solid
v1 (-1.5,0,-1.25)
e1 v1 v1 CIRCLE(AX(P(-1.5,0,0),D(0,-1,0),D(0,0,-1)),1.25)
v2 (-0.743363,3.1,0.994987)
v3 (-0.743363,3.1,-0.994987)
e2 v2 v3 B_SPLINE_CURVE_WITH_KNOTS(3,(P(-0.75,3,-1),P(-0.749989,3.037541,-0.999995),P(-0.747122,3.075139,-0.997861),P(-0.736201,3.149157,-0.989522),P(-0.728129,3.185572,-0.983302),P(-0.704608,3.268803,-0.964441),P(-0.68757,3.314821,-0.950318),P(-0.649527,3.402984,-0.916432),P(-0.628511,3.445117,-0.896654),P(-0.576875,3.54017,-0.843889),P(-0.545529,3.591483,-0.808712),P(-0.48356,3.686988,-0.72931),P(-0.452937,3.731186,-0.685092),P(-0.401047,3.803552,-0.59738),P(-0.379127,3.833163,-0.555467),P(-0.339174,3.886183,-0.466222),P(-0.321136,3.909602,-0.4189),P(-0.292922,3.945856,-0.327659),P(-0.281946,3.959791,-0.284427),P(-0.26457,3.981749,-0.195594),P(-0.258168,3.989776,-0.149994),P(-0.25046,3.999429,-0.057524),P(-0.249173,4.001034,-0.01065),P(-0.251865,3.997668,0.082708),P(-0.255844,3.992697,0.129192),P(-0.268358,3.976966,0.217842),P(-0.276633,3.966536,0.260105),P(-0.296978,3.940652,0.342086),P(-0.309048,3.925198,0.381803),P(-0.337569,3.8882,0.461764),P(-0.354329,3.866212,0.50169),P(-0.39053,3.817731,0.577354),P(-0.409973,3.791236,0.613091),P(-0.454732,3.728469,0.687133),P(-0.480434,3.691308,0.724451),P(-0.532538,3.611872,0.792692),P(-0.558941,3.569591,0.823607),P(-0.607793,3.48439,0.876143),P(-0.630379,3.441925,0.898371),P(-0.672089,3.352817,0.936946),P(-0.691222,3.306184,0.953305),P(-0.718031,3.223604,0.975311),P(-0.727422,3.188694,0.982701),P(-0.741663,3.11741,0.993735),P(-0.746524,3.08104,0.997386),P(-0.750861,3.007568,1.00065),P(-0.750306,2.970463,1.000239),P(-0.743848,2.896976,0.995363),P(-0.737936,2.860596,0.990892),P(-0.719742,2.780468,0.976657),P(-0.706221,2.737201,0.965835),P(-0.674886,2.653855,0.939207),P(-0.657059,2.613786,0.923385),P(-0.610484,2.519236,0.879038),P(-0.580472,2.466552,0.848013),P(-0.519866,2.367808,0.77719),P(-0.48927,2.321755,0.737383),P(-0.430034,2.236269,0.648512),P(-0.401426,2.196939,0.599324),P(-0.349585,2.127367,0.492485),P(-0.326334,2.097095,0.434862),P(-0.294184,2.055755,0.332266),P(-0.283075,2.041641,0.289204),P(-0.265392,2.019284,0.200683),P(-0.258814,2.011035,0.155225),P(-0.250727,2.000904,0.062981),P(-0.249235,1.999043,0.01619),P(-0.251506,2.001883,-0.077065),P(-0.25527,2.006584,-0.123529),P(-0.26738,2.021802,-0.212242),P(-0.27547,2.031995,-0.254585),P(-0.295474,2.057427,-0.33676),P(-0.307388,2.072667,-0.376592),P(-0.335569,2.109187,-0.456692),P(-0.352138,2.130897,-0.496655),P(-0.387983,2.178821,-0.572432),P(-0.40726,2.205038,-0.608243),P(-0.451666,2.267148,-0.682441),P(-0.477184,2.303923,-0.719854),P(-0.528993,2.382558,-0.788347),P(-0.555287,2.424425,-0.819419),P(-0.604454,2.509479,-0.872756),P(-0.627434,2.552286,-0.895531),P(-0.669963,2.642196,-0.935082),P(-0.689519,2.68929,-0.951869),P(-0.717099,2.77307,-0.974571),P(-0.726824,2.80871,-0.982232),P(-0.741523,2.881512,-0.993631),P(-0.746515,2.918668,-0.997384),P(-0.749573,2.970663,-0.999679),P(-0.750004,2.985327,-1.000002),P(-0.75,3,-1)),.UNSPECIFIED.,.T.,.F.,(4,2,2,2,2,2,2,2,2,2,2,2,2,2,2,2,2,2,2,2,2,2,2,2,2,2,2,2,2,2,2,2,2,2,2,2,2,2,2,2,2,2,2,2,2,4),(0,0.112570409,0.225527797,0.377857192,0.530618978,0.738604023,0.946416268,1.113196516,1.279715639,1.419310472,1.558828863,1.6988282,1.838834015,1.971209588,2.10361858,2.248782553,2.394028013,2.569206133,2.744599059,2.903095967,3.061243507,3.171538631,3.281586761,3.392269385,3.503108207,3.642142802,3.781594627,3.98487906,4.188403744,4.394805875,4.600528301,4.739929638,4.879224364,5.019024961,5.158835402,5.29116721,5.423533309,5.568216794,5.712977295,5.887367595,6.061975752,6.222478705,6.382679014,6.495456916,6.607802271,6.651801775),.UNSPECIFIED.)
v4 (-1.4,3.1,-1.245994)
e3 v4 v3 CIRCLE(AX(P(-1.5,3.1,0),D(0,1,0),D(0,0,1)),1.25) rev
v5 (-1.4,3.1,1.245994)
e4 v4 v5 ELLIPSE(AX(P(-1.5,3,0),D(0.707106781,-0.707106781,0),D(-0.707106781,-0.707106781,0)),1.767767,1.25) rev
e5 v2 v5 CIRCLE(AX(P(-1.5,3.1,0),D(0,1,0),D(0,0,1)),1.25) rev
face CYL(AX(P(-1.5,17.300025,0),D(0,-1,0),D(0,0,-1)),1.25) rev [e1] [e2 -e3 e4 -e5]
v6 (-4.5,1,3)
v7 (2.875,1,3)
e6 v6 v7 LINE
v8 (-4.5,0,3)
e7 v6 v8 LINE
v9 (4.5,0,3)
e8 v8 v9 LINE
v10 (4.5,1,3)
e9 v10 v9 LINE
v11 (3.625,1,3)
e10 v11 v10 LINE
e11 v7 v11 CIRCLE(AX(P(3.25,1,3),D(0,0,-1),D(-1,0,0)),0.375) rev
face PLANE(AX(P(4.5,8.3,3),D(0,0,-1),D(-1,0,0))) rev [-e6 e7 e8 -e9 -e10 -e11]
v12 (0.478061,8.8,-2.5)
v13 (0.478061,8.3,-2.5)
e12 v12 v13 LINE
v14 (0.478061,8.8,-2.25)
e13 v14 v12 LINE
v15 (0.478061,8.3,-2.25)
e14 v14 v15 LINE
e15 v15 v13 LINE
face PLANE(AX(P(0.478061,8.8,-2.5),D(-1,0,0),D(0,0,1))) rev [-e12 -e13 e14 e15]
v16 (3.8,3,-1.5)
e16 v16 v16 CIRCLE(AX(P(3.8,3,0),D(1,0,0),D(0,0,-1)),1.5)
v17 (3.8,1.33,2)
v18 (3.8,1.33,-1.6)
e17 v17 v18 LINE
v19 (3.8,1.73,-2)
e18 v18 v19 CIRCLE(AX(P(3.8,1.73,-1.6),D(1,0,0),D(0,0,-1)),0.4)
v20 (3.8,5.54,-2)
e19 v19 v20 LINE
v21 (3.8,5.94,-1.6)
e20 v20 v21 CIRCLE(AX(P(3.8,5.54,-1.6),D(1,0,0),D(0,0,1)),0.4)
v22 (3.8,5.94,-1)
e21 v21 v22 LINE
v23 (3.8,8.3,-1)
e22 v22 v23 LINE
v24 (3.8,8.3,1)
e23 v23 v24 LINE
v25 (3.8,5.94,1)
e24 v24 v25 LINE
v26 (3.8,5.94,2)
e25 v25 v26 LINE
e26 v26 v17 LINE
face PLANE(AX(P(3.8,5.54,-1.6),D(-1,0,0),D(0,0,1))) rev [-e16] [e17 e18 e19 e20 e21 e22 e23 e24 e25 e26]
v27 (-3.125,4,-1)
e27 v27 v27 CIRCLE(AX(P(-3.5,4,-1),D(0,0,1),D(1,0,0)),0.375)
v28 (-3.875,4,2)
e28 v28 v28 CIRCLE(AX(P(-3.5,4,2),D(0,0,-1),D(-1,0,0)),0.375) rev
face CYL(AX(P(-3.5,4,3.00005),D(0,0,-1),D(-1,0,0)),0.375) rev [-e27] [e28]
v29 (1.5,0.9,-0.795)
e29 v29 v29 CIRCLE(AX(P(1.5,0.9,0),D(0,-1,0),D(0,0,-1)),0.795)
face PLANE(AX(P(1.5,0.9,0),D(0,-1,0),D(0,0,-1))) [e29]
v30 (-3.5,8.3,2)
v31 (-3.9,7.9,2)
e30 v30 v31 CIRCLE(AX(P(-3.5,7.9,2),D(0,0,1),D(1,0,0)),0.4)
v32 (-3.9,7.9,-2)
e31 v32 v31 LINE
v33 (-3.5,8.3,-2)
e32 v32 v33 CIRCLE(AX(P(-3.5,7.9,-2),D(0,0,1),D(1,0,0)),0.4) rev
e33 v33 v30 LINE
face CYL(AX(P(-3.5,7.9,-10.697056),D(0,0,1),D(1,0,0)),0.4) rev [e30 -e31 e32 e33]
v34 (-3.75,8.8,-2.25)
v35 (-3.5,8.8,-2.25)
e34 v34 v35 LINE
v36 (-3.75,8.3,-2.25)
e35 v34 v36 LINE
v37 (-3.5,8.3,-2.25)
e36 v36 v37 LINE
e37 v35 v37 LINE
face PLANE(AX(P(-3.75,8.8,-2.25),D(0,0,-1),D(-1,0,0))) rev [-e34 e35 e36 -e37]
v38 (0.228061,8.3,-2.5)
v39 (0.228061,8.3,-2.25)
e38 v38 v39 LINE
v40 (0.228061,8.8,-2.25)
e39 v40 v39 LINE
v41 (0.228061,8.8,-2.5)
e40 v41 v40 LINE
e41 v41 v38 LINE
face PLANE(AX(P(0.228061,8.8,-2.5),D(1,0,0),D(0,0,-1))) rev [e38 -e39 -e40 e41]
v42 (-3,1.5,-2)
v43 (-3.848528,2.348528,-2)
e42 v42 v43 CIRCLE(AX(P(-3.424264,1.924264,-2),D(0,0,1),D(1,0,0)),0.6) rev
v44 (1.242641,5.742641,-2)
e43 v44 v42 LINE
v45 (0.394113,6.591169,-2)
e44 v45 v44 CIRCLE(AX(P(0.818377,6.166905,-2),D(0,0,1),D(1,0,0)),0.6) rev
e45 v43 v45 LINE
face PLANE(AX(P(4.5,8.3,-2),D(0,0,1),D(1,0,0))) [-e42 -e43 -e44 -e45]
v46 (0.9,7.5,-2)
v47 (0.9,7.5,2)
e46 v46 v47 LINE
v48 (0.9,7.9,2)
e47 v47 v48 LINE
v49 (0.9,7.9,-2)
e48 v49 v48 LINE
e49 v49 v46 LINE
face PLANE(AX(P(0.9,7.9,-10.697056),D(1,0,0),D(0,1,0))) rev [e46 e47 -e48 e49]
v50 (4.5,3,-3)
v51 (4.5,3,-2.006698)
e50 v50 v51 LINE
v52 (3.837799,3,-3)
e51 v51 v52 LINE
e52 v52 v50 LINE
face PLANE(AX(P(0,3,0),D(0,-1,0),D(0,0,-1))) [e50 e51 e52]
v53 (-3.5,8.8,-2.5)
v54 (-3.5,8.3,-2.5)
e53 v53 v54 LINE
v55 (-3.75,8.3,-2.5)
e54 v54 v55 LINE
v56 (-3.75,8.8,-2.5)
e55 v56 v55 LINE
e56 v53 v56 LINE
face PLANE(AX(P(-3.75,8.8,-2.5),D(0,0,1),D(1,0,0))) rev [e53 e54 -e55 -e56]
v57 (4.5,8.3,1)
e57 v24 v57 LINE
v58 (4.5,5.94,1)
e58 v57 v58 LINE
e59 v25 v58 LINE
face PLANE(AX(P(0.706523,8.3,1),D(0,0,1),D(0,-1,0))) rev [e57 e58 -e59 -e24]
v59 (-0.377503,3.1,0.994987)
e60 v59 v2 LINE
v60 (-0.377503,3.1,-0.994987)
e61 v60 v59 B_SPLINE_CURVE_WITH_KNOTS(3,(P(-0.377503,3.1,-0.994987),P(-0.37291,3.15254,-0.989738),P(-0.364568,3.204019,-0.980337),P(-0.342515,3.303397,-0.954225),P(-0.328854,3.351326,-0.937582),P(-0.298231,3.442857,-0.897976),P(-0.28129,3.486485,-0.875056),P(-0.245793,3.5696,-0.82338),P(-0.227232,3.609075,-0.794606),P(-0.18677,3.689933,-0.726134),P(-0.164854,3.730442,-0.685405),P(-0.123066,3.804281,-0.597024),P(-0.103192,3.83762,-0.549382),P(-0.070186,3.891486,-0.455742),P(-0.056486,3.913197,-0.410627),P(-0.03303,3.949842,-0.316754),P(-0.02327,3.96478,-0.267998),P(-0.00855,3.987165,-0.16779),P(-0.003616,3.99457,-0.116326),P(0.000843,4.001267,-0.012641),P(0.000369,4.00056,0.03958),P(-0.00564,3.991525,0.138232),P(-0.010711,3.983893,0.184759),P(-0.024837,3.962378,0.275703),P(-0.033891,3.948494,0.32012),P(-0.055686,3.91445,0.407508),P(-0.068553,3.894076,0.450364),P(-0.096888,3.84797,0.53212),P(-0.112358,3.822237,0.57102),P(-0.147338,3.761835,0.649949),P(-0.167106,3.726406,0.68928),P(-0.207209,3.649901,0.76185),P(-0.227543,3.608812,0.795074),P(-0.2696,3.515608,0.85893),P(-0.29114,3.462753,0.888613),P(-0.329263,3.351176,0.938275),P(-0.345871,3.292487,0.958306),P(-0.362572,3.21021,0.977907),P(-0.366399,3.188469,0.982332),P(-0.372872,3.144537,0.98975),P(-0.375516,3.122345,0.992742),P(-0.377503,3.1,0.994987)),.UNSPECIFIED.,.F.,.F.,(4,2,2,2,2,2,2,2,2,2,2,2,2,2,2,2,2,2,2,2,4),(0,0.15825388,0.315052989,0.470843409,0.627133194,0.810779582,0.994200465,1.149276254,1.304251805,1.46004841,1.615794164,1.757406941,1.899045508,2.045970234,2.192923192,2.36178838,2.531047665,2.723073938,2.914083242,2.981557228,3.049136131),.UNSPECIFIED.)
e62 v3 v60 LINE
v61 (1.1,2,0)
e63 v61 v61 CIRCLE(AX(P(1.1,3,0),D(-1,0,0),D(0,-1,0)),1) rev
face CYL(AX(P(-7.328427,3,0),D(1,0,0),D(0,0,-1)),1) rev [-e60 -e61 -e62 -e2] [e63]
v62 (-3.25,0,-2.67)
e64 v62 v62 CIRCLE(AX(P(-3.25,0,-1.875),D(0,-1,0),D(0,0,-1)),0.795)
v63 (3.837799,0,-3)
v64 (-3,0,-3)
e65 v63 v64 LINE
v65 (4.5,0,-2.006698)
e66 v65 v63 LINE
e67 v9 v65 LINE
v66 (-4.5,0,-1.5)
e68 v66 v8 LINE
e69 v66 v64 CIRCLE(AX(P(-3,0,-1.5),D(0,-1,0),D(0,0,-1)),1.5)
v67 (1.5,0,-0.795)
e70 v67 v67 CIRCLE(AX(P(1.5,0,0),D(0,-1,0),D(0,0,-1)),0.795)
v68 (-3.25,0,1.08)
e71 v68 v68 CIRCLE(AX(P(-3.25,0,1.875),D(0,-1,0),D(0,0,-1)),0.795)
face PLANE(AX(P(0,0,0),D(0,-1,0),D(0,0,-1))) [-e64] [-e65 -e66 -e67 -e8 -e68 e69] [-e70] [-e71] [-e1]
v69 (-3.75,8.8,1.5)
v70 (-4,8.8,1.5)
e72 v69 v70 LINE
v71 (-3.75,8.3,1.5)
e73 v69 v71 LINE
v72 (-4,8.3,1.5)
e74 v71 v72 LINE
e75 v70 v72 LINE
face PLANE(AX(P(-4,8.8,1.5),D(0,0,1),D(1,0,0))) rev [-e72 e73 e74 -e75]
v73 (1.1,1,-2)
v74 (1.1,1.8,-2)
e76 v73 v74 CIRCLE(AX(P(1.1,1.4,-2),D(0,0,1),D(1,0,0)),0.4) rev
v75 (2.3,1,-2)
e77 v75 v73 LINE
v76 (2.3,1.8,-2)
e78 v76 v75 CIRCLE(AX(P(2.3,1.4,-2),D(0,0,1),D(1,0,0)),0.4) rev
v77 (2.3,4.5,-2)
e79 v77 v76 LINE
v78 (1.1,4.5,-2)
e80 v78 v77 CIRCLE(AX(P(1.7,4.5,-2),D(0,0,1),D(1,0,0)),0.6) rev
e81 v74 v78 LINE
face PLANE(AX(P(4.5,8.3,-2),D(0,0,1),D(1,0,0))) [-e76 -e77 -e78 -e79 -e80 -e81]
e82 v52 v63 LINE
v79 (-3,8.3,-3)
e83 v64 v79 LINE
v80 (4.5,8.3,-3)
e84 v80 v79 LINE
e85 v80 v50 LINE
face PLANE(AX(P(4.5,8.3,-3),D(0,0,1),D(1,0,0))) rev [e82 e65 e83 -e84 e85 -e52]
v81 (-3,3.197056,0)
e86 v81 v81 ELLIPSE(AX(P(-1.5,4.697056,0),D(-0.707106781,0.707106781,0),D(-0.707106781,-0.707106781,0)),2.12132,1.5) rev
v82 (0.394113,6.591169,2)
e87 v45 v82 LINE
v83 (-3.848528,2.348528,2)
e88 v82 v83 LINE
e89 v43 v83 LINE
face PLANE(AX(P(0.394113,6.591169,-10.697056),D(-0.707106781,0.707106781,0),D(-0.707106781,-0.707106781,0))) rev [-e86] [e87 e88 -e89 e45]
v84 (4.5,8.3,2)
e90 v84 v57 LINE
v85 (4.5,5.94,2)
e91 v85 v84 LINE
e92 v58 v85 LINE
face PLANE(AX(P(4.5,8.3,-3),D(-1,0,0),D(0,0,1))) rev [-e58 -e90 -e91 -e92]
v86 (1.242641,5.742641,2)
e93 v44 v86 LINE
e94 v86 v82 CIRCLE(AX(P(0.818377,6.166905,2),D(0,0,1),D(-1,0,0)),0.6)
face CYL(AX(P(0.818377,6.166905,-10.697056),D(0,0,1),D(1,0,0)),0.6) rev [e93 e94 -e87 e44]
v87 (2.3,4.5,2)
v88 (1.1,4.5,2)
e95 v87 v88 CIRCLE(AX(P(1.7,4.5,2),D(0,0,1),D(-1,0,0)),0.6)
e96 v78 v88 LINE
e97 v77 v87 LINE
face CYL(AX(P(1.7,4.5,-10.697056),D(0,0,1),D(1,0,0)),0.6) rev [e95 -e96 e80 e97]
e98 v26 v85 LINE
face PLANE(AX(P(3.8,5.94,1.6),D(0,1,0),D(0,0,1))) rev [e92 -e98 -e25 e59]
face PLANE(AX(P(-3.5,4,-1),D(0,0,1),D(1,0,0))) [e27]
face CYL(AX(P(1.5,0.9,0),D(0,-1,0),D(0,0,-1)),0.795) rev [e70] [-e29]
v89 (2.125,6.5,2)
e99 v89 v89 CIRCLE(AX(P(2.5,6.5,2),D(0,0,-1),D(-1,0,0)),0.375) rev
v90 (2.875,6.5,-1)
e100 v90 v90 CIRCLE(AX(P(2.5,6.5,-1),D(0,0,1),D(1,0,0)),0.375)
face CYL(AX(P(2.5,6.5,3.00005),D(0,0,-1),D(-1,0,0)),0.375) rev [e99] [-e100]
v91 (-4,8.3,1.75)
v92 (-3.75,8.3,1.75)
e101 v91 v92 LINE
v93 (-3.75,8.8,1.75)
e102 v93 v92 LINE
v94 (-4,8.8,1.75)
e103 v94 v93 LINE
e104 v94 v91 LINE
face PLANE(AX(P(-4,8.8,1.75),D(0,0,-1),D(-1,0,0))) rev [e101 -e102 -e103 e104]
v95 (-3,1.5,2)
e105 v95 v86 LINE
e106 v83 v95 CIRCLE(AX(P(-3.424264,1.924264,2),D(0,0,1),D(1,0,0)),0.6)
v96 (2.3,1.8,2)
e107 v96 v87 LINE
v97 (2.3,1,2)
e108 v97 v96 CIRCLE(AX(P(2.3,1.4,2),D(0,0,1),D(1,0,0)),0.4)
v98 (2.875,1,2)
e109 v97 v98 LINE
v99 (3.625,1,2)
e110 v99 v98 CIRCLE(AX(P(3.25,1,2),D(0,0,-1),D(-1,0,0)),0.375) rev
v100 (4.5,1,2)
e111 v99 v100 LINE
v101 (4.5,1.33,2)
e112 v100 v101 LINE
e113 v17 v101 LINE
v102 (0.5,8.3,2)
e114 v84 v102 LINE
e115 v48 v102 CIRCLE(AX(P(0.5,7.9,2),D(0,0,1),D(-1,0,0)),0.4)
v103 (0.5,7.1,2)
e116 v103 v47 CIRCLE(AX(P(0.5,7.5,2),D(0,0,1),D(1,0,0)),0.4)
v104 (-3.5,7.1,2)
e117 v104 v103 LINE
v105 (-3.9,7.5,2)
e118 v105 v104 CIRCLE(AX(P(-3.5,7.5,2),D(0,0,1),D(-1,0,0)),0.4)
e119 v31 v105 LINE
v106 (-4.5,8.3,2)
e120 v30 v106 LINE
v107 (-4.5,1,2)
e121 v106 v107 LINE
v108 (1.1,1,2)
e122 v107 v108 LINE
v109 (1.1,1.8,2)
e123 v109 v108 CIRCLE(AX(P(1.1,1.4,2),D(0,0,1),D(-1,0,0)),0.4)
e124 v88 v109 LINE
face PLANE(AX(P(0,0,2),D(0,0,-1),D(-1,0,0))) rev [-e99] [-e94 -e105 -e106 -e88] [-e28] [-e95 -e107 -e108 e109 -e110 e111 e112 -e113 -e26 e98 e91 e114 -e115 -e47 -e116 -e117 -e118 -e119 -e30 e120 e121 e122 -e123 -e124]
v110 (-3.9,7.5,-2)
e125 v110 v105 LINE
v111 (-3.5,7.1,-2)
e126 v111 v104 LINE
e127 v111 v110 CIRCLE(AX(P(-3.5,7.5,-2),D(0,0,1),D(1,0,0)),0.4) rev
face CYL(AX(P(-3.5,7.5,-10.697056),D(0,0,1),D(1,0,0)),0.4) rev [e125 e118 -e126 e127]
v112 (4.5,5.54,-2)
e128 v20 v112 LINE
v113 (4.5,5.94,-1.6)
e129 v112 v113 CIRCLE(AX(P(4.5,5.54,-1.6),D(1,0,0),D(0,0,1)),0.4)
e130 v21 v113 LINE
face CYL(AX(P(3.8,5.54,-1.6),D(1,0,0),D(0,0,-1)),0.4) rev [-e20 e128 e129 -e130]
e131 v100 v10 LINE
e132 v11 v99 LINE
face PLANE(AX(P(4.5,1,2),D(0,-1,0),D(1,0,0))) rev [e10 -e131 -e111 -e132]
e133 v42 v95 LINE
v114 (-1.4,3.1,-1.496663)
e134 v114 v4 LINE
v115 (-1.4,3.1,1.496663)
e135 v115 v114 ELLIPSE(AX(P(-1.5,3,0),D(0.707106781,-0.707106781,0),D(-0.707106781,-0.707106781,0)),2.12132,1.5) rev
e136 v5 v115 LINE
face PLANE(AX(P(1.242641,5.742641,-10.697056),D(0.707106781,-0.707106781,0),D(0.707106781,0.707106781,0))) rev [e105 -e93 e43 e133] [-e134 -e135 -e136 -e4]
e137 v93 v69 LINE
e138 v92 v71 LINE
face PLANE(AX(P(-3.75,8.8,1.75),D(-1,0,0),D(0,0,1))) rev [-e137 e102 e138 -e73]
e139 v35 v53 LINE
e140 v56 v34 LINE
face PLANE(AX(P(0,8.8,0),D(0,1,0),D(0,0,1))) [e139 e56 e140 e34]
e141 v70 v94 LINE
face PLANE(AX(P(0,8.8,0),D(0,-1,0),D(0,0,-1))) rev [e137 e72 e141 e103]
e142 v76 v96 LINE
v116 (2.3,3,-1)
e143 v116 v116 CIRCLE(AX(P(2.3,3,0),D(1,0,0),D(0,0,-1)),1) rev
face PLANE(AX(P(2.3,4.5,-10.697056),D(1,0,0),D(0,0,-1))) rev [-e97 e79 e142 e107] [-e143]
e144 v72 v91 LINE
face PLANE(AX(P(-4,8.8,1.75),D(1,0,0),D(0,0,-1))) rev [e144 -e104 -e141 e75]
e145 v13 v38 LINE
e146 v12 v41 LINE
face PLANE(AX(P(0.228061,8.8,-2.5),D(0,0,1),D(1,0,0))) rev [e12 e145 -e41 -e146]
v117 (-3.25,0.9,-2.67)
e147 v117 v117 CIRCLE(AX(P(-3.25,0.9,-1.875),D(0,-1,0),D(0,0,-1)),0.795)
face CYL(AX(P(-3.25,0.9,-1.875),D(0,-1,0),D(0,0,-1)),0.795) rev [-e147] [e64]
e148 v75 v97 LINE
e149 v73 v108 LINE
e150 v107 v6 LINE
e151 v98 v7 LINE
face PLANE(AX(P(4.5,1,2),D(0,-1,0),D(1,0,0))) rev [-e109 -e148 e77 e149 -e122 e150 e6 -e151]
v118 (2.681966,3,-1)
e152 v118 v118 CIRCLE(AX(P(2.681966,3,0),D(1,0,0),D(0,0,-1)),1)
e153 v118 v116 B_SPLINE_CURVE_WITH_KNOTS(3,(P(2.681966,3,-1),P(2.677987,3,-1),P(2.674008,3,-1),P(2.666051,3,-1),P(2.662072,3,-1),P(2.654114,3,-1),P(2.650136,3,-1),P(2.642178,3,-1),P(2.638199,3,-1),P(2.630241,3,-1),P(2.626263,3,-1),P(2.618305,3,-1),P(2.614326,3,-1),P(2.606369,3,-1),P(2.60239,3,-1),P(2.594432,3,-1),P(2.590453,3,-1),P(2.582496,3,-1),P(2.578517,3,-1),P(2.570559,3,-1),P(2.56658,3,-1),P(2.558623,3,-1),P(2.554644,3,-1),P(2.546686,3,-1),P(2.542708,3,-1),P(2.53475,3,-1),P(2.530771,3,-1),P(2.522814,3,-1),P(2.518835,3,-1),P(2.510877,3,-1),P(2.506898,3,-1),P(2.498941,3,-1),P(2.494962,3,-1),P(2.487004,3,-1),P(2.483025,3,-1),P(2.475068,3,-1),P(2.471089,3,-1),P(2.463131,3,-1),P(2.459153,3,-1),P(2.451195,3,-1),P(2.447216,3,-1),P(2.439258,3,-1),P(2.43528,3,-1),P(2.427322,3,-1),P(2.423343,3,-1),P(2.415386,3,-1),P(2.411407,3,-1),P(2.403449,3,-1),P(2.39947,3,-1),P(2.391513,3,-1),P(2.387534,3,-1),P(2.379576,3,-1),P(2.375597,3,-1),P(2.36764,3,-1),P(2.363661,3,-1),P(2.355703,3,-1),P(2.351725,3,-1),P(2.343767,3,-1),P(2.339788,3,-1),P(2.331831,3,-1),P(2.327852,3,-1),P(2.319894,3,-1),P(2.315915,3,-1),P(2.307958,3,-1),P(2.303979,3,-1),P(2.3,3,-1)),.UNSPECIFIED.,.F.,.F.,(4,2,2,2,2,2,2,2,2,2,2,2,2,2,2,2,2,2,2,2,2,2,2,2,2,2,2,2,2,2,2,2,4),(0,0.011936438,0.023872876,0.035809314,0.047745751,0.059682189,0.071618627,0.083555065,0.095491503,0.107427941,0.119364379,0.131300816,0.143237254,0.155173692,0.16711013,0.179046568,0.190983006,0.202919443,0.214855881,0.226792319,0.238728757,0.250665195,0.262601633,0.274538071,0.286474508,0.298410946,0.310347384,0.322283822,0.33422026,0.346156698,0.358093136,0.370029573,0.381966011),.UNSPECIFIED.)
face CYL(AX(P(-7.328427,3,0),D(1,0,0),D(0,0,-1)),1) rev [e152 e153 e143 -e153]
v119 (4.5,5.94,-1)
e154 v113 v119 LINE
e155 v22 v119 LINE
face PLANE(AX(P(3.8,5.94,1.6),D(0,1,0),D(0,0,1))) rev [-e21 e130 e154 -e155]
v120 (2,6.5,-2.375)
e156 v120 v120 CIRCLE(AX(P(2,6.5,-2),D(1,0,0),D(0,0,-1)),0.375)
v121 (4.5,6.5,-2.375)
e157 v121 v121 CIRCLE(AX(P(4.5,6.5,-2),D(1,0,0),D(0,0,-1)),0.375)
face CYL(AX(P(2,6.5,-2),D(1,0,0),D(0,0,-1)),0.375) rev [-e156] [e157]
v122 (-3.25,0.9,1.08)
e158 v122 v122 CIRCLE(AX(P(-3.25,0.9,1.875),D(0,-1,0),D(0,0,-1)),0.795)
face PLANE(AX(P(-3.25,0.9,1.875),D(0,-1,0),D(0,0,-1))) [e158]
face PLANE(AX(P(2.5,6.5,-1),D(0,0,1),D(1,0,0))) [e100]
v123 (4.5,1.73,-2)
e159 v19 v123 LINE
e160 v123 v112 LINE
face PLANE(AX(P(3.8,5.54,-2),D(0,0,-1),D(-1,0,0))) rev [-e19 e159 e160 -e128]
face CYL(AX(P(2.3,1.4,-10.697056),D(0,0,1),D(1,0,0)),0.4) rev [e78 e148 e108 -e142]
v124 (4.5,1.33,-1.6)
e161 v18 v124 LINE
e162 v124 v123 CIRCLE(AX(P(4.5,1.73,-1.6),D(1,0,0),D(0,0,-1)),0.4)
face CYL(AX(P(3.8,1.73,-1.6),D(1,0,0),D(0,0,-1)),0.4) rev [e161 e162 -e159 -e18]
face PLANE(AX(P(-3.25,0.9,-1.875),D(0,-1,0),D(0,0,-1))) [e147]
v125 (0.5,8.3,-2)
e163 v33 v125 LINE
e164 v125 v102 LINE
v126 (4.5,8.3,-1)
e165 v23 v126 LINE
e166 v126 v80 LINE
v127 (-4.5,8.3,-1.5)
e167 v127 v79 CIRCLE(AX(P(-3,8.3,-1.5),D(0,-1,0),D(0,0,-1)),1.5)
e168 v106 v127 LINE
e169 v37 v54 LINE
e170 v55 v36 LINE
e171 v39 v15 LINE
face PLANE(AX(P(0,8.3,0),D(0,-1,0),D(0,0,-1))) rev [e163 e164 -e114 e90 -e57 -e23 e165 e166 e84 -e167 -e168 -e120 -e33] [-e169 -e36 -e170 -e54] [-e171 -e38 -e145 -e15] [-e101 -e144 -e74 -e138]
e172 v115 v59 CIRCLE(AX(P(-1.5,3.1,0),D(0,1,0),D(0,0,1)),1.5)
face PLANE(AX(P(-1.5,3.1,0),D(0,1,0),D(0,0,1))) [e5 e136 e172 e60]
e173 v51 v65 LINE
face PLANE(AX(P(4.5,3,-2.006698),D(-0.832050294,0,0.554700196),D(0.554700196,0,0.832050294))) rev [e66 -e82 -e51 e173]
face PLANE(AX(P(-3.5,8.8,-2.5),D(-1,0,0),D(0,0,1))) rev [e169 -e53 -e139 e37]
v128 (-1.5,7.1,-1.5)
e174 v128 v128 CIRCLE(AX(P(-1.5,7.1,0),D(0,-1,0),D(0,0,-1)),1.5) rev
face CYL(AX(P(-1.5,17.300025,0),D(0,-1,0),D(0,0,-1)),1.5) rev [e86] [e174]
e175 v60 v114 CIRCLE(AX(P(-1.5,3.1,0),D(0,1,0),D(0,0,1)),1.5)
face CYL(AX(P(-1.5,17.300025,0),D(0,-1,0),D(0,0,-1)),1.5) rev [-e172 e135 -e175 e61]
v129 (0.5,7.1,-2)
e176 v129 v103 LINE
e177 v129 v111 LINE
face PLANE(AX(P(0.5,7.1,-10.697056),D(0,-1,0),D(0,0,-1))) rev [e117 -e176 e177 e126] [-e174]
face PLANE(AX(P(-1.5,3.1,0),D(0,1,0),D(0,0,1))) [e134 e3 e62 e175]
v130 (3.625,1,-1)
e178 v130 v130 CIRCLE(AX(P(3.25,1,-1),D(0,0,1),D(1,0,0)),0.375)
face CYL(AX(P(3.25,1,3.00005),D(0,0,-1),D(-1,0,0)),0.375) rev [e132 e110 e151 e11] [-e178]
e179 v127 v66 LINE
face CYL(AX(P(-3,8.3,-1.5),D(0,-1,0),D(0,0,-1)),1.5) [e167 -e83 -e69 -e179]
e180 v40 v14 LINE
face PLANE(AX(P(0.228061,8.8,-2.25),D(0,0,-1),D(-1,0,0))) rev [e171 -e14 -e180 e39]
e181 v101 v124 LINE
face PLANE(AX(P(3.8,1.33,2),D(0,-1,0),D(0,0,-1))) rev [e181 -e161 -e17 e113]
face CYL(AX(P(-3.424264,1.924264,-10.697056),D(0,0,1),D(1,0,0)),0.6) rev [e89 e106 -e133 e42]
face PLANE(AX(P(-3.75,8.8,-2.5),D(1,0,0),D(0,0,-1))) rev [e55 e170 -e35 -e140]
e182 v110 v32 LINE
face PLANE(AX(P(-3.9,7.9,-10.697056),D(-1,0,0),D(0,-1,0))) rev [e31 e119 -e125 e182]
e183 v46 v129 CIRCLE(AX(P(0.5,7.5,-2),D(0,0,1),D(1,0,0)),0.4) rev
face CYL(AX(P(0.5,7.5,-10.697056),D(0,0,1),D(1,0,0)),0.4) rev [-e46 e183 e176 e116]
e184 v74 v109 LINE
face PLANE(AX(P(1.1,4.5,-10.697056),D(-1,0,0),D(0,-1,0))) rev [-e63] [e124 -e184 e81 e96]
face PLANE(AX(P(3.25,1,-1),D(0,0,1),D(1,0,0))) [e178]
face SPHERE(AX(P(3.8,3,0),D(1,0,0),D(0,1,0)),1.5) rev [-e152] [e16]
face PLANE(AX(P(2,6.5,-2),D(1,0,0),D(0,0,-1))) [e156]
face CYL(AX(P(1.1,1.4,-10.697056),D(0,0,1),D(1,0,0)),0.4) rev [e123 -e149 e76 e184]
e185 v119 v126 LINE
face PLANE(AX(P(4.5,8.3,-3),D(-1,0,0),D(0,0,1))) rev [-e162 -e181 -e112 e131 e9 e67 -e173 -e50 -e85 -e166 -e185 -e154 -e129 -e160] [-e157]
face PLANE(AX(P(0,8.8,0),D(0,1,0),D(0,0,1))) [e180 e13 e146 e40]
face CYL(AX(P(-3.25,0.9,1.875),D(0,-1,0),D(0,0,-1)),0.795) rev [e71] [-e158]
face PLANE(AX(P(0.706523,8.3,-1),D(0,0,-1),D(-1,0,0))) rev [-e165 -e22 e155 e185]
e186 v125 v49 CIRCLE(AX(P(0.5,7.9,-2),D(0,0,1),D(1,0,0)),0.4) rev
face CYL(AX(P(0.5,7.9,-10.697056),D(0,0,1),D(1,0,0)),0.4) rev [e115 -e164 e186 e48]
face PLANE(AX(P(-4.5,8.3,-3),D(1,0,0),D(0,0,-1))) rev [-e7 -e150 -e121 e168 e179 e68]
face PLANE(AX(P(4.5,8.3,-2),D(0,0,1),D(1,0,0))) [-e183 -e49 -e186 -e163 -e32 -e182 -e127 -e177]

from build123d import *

# Parameters (mm, degrees)
SKETCH1_W                       = 9
SKETCH1_H                       = 6
MAIN_BODY_EXT_DEPTH             = 8.3
EMISSION_PATH_EXT_DEPTH         = 9
SKETCH3_R                       = 1.25
EMISSION_AND_GRIN_CUT_DEPTH     = 19.125672401
SKETCH4_R                       = 1
DRUM_LENS_CUT_DEPTH             = 7
SKETCH5_W                       = 9
SKETCH5_H                       = 7.3
FILTERSET_CUT1_DEPTH            = 1
FILTERSET_CUT2_DEPTH            = 4
SKETCH10_R                      = 2.5
EMISSION_LENS_CUT_DEPTH         = 8.5
SKETCH15_R                      = 0.795
MAGNETS_CUT_DEPTH               = 0.9
SCREW_HOLES_CUT_DEPTH           = 19.561788707
SCREW_HOLES_CUT_DEPTH_BACK      = 3
SKETCH18_R                      = 0.375
EXTERNAL_FILLET_1_R             = 1.5
CUT_EXTRUDE8_DEPTH              = 12.545128843
CUT_EXTRUDE8_DEPTH_BACK         = 4
SKETCH28_R                      = 1.5
CUT_EXTRUDE9_DEPTH              = 3
CUT_EXTRUDE10_DEPTH             = 0.7
SKETCH29_R                      = 0.375
CUT_EXTRUDE11_DEPTH             = 2.5
SKETCH32_W                      = 2
SKETCH32_H                      = 2.36
CUT_EXTRUDE14_DEPTH             = 0.7
CUT_EXTRUDE16_DEPTH             = 9
CUT_EXTRUDE17_REACH             = 12.329
SKETCH37_R                      = 2
CUT_EXTRUDE18_START             = -9
CUT_EXTRUDE18_DEPTH             = 9
CUT_EXTRUDE19_REACH             = 20.126
SKETCH39_W                      = 5.765434423
SKETCH39_H                      = 9
CUT_EXTRUDE19_DIRECTION_2_REACH = 20.126
SKETCH40_W                      = 0.25
SKETCH40_H                      = 0.25
BOSS_EXTRUDE1_DEPTH             = 0.5


with BuildPart() as part:
    # Sketch1 → Main Body Ext (new body)
    with BuildSketch(Plane(origin=(0, 0, 0), x_dir=(1, 0, 0), z_dir=(0, 1, 0))):
        Rectangle(SKETCH1_W, SKETCH1_H)
    extrude(amount=MAIN_BODY_EXT_DEPTH)

    # Sketch8 → Emission Path Ext (add)
    with BuildSketch(Plane(origin=(0, 8.3, 0), x_dir=(1, 0, 0), z_dir=(0, 1, 0))):
        Polygon((0.25, 3), (1.5, 1.75), (1.5, -3), (-4.5, -3), (-4.5, 3), align=None)
    extrude(amount=EMISSION_PATH_EXT_DEPTH)

    # Sketch3 → Emission and Grin Cut (cut, through all)
    with BuildSketch(Plane.XZ):
        with Locations(Location((-1.5, 0, 0), (0, 0, 270))):
            Circle(SKETCH3_R)
    extrude(amount=-EMISSION_AND_GRIN_CUT_DEPTH, mode=Mode.SUBTRACT)

    # Sketch4 → Drum Lens Cut (cut)
    with BuildSketch(Plane(origin=(4.5, 0, 0), x_dir=(0, 0, -1), z_dir=(1, 0, 0))):
        with Locations((0, 3)):
            Circle(SKETCH4_R)
    extrude(amount=-DRUM_LENS_CUT_DEPTH, mode=Mode.SUBTRACT)

    # Sketch5 → FilterSet Cut1 (cut)
    with BuildSketch(Plane.XY.offset(3)):
        with Locations((0, 4.65)):
            Rectangle(SKETCH5_W, SKETCH5_H)
    extrude(amount=-FILTERSET_CUT1_DEPTH, mode=Mode.SUBTRACT)

    # Sketch6 → FilterSet Cut2 (cut)
    with BuildSketch(Plane.XY.offset(2)):
        with BuildLine():
            Line((2.3, 4.5), (2.3, 1.8))
            ThreePointArc((2.3, 1.8), (2.7, 1.4), (2.3, 1))
            Line((2.3, 1), (1.1, 1))
            ThreePointArc((1.1, 1), (0.7, 1.4), (1.1, 1.8))
            Line((1.1, 1.8), (1.1, 4.5))
            ThreePointArc((1.1, 4.5), (1.7, 5.1), (2.3, 4.5))
        make_face()
        with BuildLine():
            Line((-3.9, 7.9), (-3.9, 7.5))
            ThreePointArc((-3.9, 7.5), (-3.782842712, 7.217157288), (-3.5, 7.1))
            Line((-3.5, 7.1), (0.5, 7.1))
            ThreePointArc((0.5, 7.1), (0.782842712, 7.217157288), (0.9, 7.5))
            Line((0.9, 7.5), (0.9, 7.9))
            ThreePointArc((0.9, 7.9), (0.782842712, 8.182842712), (0.5, 8.3))
            Line((0.5, 8.3), (-3.5, 8.3))
            ThreePointArc((-3.5, 8.3), (-3.782842712, 8.182842712), (-3.9, 7.9))
        make_face()
        with BuildLine():
            Line((0.39411255, 6.591168825), (-3.848528137, 2.348528137))
            ThreePointArc((-3.848528137, 2.348528137), (-3.848528137, 1.5), (-3, 1.5))
            Line((-3, 1.5), (1.242640687, 5.742640687))
            ThreePointArc((1.242640687, 5.742640687), (1.242640687, 6.591168825), (0.39411255, 6.591168825))
        make_face()
    extrude(amount=-FILTERSET_CUT2_DEPTH, mode=Mode.SUBTRACT)

    # Sketch10 → Emission Lens Cut (cut)
    with BuildSketch(Plane(origin=(0, 17.3, 0), x_dir=(1, 0, 0), z_dir=(0, 1, 0))):
        with Locations(Location((-1.5, 0, 0), (0, 0, 270))):
            Circle(SKETCH10_R)
    extrude(amount=-EMISSION_LENS_CUT_DEPTH, mode=Mode.SUBTRACT)

    # Sketch15 → Magnets Cut (cut)
    with BuildSketch(Plane.XZ):
        with Locations(Location((-3.25, -1.875, 0), (0, 0, 270))):
            Circle(SKETCH15_R)
        with Locations(Location((-3.25, 1.875, 0), (0, 0, 270))):
            Circle(SKETCH15_R)
        with Locations(Location((1.5, 0, 0), (0, 0, 270))):
            Circle(SKETCH15_R)
    extrude(amount=-MAGNETS_CUT_DEPTH, mode=Mode.SUBTRACT)

    # Sketch18 → Screw Holes Cut (cut, two sides: drawn at the far end of the back side and taken through both)
    with BuildSketch(Plane.XY.offset(2).offset(-SCREW_HOLES_CUT_DEPTH_BACK)):
        with Locations(Location((-3.5, 4, 0), (0, 0, 180))):
            Circle(SKETCH18_R)
        with Locations(Location((2.5, 6.5, 0), (0, 0, 180))):
            Circle(SKETCH18_R)
        with Locations((3.25, 1)):
            Circle(SKETCH18_R)
    extrude(amount=SCREW_HOLES_CUT_DEPTH + SCREW_HOLES_CUT_DEPTH_BACK, mode=Mode.SUBTRACT)

    # External Fillet 1
    # the kernel refuses this fillet: 1.5 mm, written as the material it takes off along each edge
    with BuildSketch(Plane(origin=(-4.5, -3.75, -3), x_dir=(1, 0, 0), z_dir=(0, 1, 0))) as external_fillet_1_piece_1:
        with BuildLine():
            CenterArc((EXTERNAL_FILLET_1_R, -EXTERNAL_FILLET_1_R), EXTERNAL_FILLET_1_R, 90, 90)
            Line((0, -EXTERNAL_FILLET_1_R), (0, 0))
            Line((0, 0), (EXTERNAL_FILLET_1_R, 0))
        make_face()
    extrude(amount=24.8, mode=Mode.SUBTRACT)
    with BuildSketch(Plane(origin=(1.5, 8.3, 3), x_dir=(0, 0, -1), z_dir=(0, 1, 0))) as external_fillet_1_piece_2:
        with BuildLine():
            CenterArc((EXTERNAL_FILLET_1_R, EXTERNAL_FILLET_1_R), EXTERNAL_FILLET_1_R, 180, 90)
            Line((0, EXTERNAL_FILLET_1_R), (0, 0))
            Line((0, 0), (EXTERNAL_FILLET_1_R, 0))
        make_face()
    extrude(amount=12.75, mode=Mode.SUBTRACT)

    # Sketch28 → Cut-Extrude8 (cut, two sides: drawn at the far end of the back side and taken through both)
    with BuildSketch(Plane(origin=(0, 7.1, 0), x_dir=(1, 0, 0), z_dir=(0, 1, 0)).offset(-CUT_EXTRUDE8_DEPTH_BACK)):
        with Locations(Location((-1.5, 0, 0), (0, 0, 180))):
            Circle(SKETCH28_R)
    extrude(amount=CUT_EXTRUDE8_DEPTH + CUT_EXTRUDE8_DEPTH_BACK, mode=Mode.SUBTRACT)

    # Sketch14 → Cut-Extrude9 (cut)
    with BuildSketch(Plane.XZ):
        Polygon((4.5, -3), (4.5, -2.006698359), (3.837798906, -3), align=None)
    extrude(amount=-CUT_EXTRUDE9_DEPTH, mode=Mode.SUBTRACT)

    # Sketch12 → Cut-Extrude10 (cut)
    with BuildSketch(Plane(origin=(4.5, 0, 0), x_dir=(0, 0, -1), z_dir=(1, 0, 0))):
        with BuildLine():
            Line((1.6, 5.94), (-1.6, 5.94))
            Line((-1.6, 5.94), (-2, 5.94))
            Line((-2, 5.94), (-2, 1.33))
            Line((-2, 1.33), (1.6, 1.33))
            ThreePointArc((1.6, 1.33), (1.882842712, 1.447157288), (2, 1.73))
            Line((2, 1.73), (2, 5.54))
            ThreePointArc((2, 5.54), (1.882842712, 5.822842712), (1.6, 5.94))
        make_face()
    extrude(amount=-CUT_EXTRUDE10_DEPTH, mode=Mode.SUBTRACT)

    # Sketch29 → Cut-Extrude11 (cut)
    with BuildSketch(Plane(origin=(4.5, 0, 0), x_dir=(0, 0, -1), z_dir=(1, 0, 0))):
        with Locations((2, 6.5)):
            Circle(SKETCH29_R)
    extrude(amount=-CUT_EXTRUDE11_DEPTH, mode=Mode.SUBTRACT)

    # Sketch32 → Cut-Extrude14 (cut)
    with BuildSketch(Plane(origin=(4.5, 0, 0), x_dir=(0, 0, -1), z_dir=(1, 0, 0))):
        with Locations((0, 7.12)):
            Rectangle(SKETCH32_W, SKETCH32_H)
    extrude(amount=-CUT_EXTRUDE14_DEPTH, mode=Mode.SUBTRACT)

    # Sketch33 → Cut-Revolve1 (revolve, cut)
    with BuildSketch(Plane.XY, mode=Mode.PRIVATE) as cut_revolve1_sk:
        with BuildLine():
            Line((3.8, 3), (2.3, 3))
            ThreePointArc((2.3, 3), (2.739339828, 4.060660172), (3.8, 4.5))
            Line((3.8, 4.5), (3.8, 3))
        make_face()
    revolve(cut_revolve1_sk.sketch.rotate(Axis((3.8, 3, 0), (-1, 0, 0)), 90), axis=Axis((3.8, 3, 0), (-1, 0, 0)), mode=Mode.SUBTRACT)

    # Sketch36 → Cut-Extrude16 (cut)
    with BuildSketch(Plane(origin=(0, 17.3, 0), x_dir=(1, 0, 0), z_dir=(0, 1, 0))):
        with BuildLine():
            Line((-4.5, -1.5), (-4.5, -3))
            Line((-4.5, -3), (-3, -3))
            ThreePointArc((-3, -3), (-4.060660172, -2.560660172), (-4.5, -1.5))
        make_face()
    extrude(amount=-CUT_EXTRUDE16_DEPTH, mode=Mode.SUBTRACT)

    # Sketch37 → Cut-Extrude17 (cut, up to next)
    with BuildSketch(Plane(origin=(0, 8.8, 0), x_dir=(1, 0, 0), z_dir=(0, 1, 0)), mode=Mode.PRIVATE) as cut_extrude17_sk1:
        with Locations(Location((-1.5, 0, 0), (0, 0, 180))):
            Circle(SKETCH37_R)
    cut_extrude17_tool1 = extrude(cut_extrude17_sk1.sketch, amount=-CUT_EXTRUDE17_REACH, mode=Mode.PRIVATE) & part.part
    add(cut_extrude17_tool1.solids().sort_by_distance((-1.5, 8.8, 0))[0], mode=Mode.SUBTRACT)

    # Sketch38 → Cut-Extrude18 (cut)
    with BuildSketch(Plane(origin=(0, 17.3, 0), x_dir=(1, 0, 0), z_dir=(0, 1, 0)).offset(CUT_EXTRUDE18_START)):
        with BuildLine():
            Line((-3, 3), (0.25, 3))
            Line((0.25, 3), (1.5, 1.75))
            Line((1.5, 1.75), (1.5, -1.5))
            ThreePointArc((1.5, -1.5), (1.060660172, -2.560660172), (0, -3))
            Line((0, -3), (-3, -3))
            ThreePointArc((-3, -3), (-4.060660172, -2.560660172), (-4.5, -1.5))
            Line((-4.5, -1.5), (-4.5, 1.5))
            ThreePointArc((-4.5, 1.5), (-4.060660172, 2.560660172), (-3, 3))
        make_face()
        with BuildLine():
            Line((-4.375, -1.5), (-4.375, 1.5))
            ThreePointArc((-4.375, 1.5), (-3.940482173, 2.440482173), (-3, 2.875))
            Line((-3, 2.875), (0.25, 2.875))
            Line((0.25, 2.875), (1.375, 1.75))
            Line((1.375, 1.75), (1.375, -1.5))
            ThreePointArc((1.375, -1.5), (0.972271824, -2.472271824), (0, -2.875))
            Line((0, -2.875), (-3, -2.875))
            ThreePointArc((-3, -2.875), (-3.972271824, -2.472271824), (-4.375, -1.5))
        make_face(mode=Mode.SUBTRACT)
    extrude(amount=CUT_EXTRUDE18_DEPTH, mode=Mode.SUBTRACT)

    # Cut-Extrude19: up to this face of the body (flat: up to its plane)
    cut_extrude19_end = Plane(part.part.faces().sort_by_distance((-1.375, 12.8, -2.875))[0])
    # Sketch39 → Cut-Extrude19 (cut, up to the picked face)
    with BuildSketch(Plane.XY, mode=Mode.PRIVATE) as cut_extrude19_sk1:
        with Locations((-1.507717212, 12.8)):
            Rectangle(SKETCH39_W, SKETCH39_H)
    cut_extrude19_tool1 = split(extrude(cut_extrude19_sk1.sketch, amount=-CUT_EXTRUDE19_REACH, mode=Mode.PRIVATE), bisect_by=cut_extrude19_end, keep=Keep.BOTH, mode=Mode.PRIVATE)
    add(cut_extrude19_tool1.solids().sort_by(Axis((-1.507717, 12.8, 0), (0, 0, -1)))[0], mode=Mode.SUBTRACT)

    # Cut-Extrude19 direction 2: up to this face of the body (flat: up to its plane)
    cut_extrude19_direction_2_end = Plane(part.part.faces().sort_by_distance((-1.5, 12.8, 2.875))[0])
    # Sketch39 → Cut-Extrude19 direction 2 (cut, up to the picked face)
    with BuildSketch(Plane.XY, mode=Mode.PRIVATE) as cut_extrude19_direction_2_sk1:
        with Locations((-1.507717212, 12.8)):
            Rectangle(SKETCH39_W, SKETCH39_H)
    cut_extrude19_direction_2_tool1 = split(extrude(cut_extrude19_direction_2_sk1.sketch, amount=CUT_EXTRUDE19_DIRECTION_2_REACH, mode=Mode.PRIVATE), bisect_by=cut_extrude19_direction_2_end, keep=Keep.BOTH, mode=Mode.PRIVATE)
    add(cut_extrude19_direction_2_tool1.solids().sort_by(Axis((-1.507717, 12.8, 0), (0, 0, 1)))[0], mode=Mode.SUBTRACT)

    # Sketch40 → Boss-Extrude1 (add)
    with BuildSketch(Plane(origin=(0, 8.3, 0), x_dir=(1, 0, 0), z_dir=(0, 1, 0))):
        with Locations((-3.625, 2.375)):
            Rectangle(SKETCH40_W, SKETCH40_H)
        with Locations((0.353060916, 2.375)):
            Rectangle(SKETCH40_W, SKETCH40_H)
        with Locations((-3.875, -1.625)):
            Rectangle(SKETCH40_W, SKETCH40_H)
    extrude(amount=BOSS_EXTRUDE1_DEPTH)


solid = part.part
